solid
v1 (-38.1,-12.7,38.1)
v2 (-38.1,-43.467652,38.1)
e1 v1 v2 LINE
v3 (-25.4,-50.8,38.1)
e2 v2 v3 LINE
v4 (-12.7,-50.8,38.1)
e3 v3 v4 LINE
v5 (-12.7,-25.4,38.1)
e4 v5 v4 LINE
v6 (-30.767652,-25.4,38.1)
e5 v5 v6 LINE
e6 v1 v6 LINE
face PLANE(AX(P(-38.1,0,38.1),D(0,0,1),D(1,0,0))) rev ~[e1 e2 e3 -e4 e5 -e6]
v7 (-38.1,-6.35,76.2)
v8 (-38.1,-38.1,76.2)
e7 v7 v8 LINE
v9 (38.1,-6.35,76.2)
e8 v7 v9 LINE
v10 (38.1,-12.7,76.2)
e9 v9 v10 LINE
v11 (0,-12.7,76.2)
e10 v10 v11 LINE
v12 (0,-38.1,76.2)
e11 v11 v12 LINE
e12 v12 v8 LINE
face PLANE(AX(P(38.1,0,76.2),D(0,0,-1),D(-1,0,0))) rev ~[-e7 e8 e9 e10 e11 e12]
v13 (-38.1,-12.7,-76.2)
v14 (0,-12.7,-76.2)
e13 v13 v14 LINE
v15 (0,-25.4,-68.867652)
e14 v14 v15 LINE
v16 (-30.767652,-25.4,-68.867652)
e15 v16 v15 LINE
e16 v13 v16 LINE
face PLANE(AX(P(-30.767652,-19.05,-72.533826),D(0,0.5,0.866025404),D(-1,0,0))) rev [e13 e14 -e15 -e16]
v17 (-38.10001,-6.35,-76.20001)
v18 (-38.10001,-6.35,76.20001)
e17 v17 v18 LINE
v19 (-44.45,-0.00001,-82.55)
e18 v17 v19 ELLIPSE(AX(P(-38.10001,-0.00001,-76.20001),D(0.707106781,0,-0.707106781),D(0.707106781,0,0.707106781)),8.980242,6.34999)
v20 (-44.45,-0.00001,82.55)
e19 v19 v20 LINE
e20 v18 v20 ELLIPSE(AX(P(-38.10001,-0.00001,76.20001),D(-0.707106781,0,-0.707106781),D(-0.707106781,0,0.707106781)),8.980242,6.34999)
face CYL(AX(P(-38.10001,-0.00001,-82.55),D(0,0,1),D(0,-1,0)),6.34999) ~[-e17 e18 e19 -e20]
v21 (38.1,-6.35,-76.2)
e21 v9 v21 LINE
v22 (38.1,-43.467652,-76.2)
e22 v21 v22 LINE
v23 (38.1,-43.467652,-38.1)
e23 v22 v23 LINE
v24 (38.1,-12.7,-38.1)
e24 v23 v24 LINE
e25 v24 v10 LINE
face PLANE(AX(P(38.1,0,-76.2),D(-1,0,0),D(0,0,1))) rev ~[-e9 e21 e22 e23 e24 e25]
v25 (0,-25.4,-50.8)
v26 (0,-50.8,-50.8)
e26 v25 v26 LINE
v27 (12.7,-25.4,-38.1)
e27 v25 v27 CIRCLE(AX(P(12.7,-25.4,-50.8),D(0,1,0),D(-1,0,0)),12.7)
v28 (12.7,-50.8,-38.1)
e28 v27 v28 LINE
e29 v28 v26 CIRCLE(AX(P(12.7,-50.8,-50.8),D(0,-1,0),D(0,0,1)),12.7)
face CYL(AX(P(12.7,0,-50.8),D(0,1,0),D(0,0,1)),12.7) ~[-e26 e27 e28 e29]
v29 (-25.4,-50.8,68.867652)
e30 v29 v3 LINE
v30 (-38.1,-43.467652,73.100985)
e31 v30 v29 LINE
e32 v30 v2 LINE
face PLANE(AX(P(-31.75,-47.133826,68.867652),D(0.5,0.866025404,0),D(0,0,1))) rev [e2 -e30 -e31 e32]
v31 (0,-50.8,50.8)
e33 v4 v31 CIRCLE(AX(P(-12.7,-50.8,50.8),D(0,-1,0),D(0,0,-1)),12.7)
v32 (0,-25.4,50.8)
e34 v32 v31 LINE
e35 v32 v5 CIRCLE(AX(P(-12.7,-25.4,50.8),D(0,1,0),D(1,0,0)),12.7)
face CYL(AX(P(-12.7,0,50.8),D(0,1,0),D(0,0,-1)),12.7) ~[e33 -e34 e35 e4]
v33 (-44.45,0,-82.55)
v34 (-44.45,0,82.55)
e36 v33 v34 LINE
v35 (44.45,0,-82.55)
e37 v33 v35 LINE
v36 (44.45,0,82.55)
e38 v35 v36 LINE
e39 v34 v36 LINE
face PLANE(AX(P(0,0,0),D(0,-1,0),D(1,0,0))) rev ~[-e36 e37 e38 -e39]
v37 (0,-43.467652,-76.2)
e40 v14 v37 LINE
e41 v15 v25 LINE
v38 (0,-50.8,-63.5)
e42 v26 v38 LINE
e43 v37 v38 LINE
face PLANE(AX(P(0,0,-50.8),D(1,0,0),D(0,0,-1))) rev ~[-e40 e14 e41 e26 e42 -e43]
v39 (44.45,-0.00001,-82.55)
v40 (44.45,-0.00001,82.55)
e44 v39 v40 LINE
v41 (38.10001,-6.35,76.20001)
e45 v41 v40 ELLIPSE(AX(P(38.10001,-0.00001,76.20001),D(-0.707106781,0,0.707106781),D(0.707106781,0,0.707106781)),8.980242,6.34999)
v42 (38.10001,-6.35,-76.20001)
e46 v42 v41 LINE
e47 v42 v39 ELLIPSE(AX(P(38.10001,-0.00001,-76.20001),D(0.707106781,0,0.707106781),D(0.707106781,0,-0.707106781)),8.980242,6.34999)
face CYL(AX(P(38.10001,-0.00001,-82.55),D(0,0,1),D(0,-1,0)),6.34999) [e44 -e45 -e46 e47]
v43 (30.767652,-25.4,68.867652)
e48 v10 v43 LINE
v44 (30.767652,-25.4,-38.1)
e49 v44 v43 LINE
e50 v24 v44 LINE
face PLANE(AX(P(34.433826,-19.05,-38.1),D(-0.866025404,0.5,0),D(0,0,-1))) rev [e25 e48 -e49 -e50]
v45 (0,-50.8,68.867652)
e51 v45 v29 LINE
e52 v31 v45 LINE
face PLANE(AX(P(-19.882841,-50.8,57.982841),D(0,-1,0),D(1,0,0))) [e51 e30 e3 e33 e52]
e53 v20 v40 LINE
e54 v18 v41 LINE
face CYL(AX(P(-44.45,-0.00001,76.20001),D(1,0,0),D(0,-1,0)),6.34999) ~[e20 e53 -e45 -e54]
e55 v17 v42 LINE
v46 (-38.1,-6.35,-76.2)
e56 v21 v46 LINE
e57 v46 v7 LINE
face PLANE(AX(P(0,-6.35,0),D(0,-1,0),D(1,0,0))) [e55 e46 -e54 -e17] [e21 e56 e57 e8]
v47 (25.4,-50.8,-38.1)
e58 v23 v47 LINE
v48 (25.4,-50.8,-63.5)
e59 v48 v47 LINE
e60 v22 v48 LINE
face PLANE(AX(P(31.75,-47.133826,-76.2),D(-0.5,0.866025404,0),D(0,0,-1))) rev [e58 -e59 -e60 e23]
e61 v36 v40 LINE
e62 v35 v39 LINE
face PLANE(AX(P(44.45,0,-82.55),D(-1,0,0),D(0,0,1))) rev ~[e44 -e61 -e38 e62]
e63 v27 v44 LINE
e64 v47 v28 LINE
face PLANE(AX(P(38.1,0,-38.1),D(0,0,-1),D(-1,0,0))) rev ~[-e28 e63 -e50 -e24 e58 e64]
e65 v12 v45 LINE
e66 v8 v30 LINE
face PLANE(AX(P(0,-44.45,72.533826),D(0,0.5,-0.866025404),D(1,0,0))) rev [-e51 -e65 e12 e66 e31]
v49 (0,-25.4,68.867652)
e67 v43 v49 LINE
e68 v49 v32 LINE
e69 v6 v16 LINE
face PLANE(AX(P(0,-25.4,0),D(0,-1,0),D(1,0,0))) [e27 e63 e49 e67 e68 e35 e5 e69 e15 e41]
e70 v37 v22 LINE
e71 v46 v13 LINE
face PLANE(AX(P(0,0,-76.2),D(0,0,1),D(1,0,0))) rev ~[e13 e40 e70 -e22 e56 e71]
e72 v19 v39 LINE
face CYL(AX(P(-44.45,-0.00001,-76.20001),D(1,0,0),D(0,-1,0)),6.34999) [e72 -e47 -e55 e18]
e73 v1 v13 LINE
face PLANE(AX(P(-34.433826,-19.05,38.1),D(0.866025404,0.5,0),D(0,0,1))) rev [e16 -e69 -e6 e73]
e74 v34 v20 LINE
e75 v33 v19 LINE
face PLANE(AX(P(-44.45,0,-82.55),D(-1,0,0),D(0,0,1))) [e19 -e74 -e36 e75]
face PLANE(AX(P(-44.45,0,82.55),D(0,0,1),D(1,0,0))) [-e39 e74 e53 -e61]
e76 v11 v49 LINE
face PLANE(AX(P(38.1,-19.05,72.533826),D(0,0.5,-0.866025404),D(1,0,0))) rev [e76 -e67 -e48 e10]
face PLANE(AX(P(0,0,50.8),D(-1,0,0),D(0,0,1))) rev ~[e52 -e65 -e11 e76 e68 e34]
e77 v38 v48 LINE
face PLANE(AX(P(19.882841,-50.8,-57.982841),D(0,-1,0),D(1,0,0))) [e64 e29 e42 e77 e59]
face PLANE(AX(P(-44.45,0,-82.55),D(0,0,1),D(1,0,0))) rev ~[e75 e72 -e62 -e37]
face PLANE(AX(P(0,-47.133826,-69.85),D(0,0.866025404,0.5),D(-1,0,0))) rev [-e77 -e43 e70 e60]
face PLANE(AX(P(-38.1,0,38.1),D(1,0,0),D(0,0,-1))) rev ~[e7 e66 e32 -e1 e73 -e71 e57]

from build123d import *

# Parameters (mm, degrees)
F1_DEPTH    = 25.4
F2_DEPTH    = 50.8
F0_W        = 88.9
F0_H        = 165.1
F3_DEPTH    = 6.35
F4_C1_SIZE2 = 12.7
F4_C1_SIZE  = 7.3323484187
F4_C2_SIZE2 = 7.3323484187
F4_C2_SIZE  = 12.7
F4_C3_SIZE2 = 12.7
F4_C3_SIZE  = 7.3323484187
F4_C4_SIZE2 = 12.7
F4_C4_SIZE  = 7.3323484187
F5_C1_SIZE2 = 7.3323484187
F5_C1_SIZE  = 12.7
F5_C2_SIZE2 = 7.3323484187
F5_C2_SIZE  = 12.7
F5_C3_SIZE2 = 7.3323484187
F5_C3_SIZE  = 12.7
F5_C4_SIZE2 = 7.3323484187
F5_C4_SIZE  = 12.7
F6_R        = 6.34999


# Not quite as in the source:
# - a fillet or chamfer is up to 0.001 mm smaller than in the source, because OpenCascade refuses the exact size


with BuildPart() as f1:
    # F0 (on Front) → F1 (new body)
    with BuildSketch(Plane.XZ):
        with BuildLine():
            Line((38.1, 76.2), (0, 76.2))
            Line((0, 76.2), (0, 50.8))
            ThreePointArc((0, 50.8), (-3.7197438789, 41.8197438789), (-12.7, 38.1))
            Line((-12.7, 38.1), (-38.1, 38.1))
            Line((-38.1, 38.1), (-38.1, -76.2))
            Line((-38.1, -76.2), (0, -76.2))
            Line((0, -76.2), (0, -50.8))
            ThreePointArc((0, -50.8), (3.7197438789, -41.8197438789), (12.7, -38.1))
            Line((12.7, -38.1), (38.1, -38.1))
            Line((38.1, -38.1), (38.1, 76.2))
        make_face()
    extrude(amount=F1_DEPTH)

    # F0 (on Front) → F2 (join)
    with BuildSketch(Plane.XZ):
        with BuildLine():
            Line((38.1, -76.2), (38.1, -38.1))
            Line((38.1, -38.1), (12.7, -38.1))
            ThreePointArc((12.7, -38.1), (3.7197438789, -41.8197438789), (0, -50.8))
            Line((0, -50.8), (0, -76.2))
            Line((0, -76.2), (38.1, -76.2))
        make_face()
        with BuildLine():
            Line((0, 76.2), (-38.1, 76.2))
            Line((-38.1, 76.2), (-38.1, 38.1))
            Line((-38.1, 38.1), (-12.7, 38.1))
            ThreePointArc((-12.7, 38.1), (-3.7197438789, 41.8197438789), (0, 50.8))
            Line((0, 50.8), (0, 76.2))
        make_face()
    extrude(amount=F2_DEPTH)

    # F0 (on Front) → F3 (join)
    with BuildSketch(Plane.XZ):
        Rectangle(F0_W, F0_H)
        Polygon((-38.1, 38.1), (-38.1, 76.2), (0, 76.2), (38.1, 76.2), (38.1, -38.1), (38.1, -76.2), (0, -76.2), (-38.1, -76.2), align=None, mode=Mode.SUBTRACT)
    extrude(amount=F3_DEPTH)

    # F4: chamfer of 12.7 x 7.3323484187 on 4 edges, made by hand

    # F4_c1
    f4_c1_edges = [f1.edges().sort_by_distance(p)[0] for p in [
        (38.1, -50.8, -57.15),
    ]]
    f4_c1_side = f1.faces().sort_by_distance((38.1, -50.6533530316, -57.15))[0]
    chamfer(f4_c1_edges, length=F4_C1_SIZE, length2=F4_C1_SIZE2, reference=f4_c1_side)

    # F4_c2
    f4_c2_edges = [f1.edges().sort_by_distance(p)[0] for p in [
        (-19.05, -50.8, 76.2),
    ]]
    f4_c2_side = f1.faces().sort_by_distance((-19.05, -50.6533530316, 76.2))[0]
    chamfer(f4_c2_edges, length=F4_C2_SIZE, length2=F4_C2_SIZE2, reference=f4_c2_side)

    # F4_c3
    f4_c3_edges = [f1.edges().sort_by_distance(p)[0] for p in [
        (12.7, -50.8, -76.2),
    ]]
    f4_c3_side = f1.faces().sort_by_distance((12.7, -50.6533530316, -76.2))[0]
    chamfer(f4_c3_edges, length=F4_C3_SIZE, length2=F4_C3_SIZE2, reference=f4_c3_side)

    # F4_c4
    f4_c4_edges = [f1.edges().sort_by_distance(p)[0] for p in [
        (-38.1, -50.8, 53.4838257906),
    ]]
    f4_c4_side = f1.faces().sort_by_distance((-38.1, -50.6533530316, 53.4838257906))[0]
    chamfer(f4_c4_edges, length=F4_C4_SIZE, length2=F4_C4_SIZE2, reference=f4_c4_side)

    # F5: chamfer of 12.7 x 7.3323484187 on 4 edges, made by hand

    # F5_c1
    f5_c1_edges = [f1.edges().sort_by_distance(p)[0] for p in [
        (-38.1, -25.4, -19.05),
    ]]
    f5_c1_side = f1.faces().sort_by_distance((-38.1, -25.2533530316, -19.05))[0]
    chamfer(f5_c1_edges, length=F5_C1_SIZE, length2=F5_C1_SIZE2, reference=f5_c1_side)

    # F5_c2
    f5_c2_edges = [f1.edges().sort_by_distance(p)[0] for p in [
        (19.05, -25.4, 76.2),
    ]]
    f5_c2_side = f1.faces().sort_by_distance((19.05, -25.2533530316, 76.2))[0]
    chamfer(f5_c2_edges, length=F5_C2_SIZE, length2=F5_C2_SIZE2, reference=f5_c2_side)

    # F5_c3
    f5_c3_edges = [f1.edges().sort_by_distance(p)[0] for p in [
        (38.1, -25.4, 15.3838257906),
    ]]
    f5_c3_side = f1.faces().sort_by_distance((38.1, -25.2533530316, 15.3838257906))[0]
    chamfer(f5_c3_edges, length=F5_C3_SIZE, length2=F5_C3_SIZE2, reference=f5_c3_side)

    # F5_c4
    f5_c4_edges = [f1.edges().sort_by_distance(p)[0] for p in [
        (-15.3838257906, -25.4, -76.2),
    ]]
    f5_c4_side = f1.faces().sort_by_distance((-15.3838257906, -25.2533530316, -76.2))[0]
    chamfer(f5_c4_edges, length=F5_C4_SIZE, length2=F5_C4_SIZE2, reference=f5_c4_side)

    # F6 (radius 6.35 in the source; OpenCascade refuses exactly that, so slightly less here)
    f6_edges = [f1.edges().sort_by_distance(p)[0] for p in [
        (0, -6.35, -82.55),
        (-44.45, -6.35, 0),
        (0, -6.35, 82.55),
        (44.45, -6.35, 0),
    ]]
    fillet(f6_edges, radius=F6_R)


solid = f1.part
